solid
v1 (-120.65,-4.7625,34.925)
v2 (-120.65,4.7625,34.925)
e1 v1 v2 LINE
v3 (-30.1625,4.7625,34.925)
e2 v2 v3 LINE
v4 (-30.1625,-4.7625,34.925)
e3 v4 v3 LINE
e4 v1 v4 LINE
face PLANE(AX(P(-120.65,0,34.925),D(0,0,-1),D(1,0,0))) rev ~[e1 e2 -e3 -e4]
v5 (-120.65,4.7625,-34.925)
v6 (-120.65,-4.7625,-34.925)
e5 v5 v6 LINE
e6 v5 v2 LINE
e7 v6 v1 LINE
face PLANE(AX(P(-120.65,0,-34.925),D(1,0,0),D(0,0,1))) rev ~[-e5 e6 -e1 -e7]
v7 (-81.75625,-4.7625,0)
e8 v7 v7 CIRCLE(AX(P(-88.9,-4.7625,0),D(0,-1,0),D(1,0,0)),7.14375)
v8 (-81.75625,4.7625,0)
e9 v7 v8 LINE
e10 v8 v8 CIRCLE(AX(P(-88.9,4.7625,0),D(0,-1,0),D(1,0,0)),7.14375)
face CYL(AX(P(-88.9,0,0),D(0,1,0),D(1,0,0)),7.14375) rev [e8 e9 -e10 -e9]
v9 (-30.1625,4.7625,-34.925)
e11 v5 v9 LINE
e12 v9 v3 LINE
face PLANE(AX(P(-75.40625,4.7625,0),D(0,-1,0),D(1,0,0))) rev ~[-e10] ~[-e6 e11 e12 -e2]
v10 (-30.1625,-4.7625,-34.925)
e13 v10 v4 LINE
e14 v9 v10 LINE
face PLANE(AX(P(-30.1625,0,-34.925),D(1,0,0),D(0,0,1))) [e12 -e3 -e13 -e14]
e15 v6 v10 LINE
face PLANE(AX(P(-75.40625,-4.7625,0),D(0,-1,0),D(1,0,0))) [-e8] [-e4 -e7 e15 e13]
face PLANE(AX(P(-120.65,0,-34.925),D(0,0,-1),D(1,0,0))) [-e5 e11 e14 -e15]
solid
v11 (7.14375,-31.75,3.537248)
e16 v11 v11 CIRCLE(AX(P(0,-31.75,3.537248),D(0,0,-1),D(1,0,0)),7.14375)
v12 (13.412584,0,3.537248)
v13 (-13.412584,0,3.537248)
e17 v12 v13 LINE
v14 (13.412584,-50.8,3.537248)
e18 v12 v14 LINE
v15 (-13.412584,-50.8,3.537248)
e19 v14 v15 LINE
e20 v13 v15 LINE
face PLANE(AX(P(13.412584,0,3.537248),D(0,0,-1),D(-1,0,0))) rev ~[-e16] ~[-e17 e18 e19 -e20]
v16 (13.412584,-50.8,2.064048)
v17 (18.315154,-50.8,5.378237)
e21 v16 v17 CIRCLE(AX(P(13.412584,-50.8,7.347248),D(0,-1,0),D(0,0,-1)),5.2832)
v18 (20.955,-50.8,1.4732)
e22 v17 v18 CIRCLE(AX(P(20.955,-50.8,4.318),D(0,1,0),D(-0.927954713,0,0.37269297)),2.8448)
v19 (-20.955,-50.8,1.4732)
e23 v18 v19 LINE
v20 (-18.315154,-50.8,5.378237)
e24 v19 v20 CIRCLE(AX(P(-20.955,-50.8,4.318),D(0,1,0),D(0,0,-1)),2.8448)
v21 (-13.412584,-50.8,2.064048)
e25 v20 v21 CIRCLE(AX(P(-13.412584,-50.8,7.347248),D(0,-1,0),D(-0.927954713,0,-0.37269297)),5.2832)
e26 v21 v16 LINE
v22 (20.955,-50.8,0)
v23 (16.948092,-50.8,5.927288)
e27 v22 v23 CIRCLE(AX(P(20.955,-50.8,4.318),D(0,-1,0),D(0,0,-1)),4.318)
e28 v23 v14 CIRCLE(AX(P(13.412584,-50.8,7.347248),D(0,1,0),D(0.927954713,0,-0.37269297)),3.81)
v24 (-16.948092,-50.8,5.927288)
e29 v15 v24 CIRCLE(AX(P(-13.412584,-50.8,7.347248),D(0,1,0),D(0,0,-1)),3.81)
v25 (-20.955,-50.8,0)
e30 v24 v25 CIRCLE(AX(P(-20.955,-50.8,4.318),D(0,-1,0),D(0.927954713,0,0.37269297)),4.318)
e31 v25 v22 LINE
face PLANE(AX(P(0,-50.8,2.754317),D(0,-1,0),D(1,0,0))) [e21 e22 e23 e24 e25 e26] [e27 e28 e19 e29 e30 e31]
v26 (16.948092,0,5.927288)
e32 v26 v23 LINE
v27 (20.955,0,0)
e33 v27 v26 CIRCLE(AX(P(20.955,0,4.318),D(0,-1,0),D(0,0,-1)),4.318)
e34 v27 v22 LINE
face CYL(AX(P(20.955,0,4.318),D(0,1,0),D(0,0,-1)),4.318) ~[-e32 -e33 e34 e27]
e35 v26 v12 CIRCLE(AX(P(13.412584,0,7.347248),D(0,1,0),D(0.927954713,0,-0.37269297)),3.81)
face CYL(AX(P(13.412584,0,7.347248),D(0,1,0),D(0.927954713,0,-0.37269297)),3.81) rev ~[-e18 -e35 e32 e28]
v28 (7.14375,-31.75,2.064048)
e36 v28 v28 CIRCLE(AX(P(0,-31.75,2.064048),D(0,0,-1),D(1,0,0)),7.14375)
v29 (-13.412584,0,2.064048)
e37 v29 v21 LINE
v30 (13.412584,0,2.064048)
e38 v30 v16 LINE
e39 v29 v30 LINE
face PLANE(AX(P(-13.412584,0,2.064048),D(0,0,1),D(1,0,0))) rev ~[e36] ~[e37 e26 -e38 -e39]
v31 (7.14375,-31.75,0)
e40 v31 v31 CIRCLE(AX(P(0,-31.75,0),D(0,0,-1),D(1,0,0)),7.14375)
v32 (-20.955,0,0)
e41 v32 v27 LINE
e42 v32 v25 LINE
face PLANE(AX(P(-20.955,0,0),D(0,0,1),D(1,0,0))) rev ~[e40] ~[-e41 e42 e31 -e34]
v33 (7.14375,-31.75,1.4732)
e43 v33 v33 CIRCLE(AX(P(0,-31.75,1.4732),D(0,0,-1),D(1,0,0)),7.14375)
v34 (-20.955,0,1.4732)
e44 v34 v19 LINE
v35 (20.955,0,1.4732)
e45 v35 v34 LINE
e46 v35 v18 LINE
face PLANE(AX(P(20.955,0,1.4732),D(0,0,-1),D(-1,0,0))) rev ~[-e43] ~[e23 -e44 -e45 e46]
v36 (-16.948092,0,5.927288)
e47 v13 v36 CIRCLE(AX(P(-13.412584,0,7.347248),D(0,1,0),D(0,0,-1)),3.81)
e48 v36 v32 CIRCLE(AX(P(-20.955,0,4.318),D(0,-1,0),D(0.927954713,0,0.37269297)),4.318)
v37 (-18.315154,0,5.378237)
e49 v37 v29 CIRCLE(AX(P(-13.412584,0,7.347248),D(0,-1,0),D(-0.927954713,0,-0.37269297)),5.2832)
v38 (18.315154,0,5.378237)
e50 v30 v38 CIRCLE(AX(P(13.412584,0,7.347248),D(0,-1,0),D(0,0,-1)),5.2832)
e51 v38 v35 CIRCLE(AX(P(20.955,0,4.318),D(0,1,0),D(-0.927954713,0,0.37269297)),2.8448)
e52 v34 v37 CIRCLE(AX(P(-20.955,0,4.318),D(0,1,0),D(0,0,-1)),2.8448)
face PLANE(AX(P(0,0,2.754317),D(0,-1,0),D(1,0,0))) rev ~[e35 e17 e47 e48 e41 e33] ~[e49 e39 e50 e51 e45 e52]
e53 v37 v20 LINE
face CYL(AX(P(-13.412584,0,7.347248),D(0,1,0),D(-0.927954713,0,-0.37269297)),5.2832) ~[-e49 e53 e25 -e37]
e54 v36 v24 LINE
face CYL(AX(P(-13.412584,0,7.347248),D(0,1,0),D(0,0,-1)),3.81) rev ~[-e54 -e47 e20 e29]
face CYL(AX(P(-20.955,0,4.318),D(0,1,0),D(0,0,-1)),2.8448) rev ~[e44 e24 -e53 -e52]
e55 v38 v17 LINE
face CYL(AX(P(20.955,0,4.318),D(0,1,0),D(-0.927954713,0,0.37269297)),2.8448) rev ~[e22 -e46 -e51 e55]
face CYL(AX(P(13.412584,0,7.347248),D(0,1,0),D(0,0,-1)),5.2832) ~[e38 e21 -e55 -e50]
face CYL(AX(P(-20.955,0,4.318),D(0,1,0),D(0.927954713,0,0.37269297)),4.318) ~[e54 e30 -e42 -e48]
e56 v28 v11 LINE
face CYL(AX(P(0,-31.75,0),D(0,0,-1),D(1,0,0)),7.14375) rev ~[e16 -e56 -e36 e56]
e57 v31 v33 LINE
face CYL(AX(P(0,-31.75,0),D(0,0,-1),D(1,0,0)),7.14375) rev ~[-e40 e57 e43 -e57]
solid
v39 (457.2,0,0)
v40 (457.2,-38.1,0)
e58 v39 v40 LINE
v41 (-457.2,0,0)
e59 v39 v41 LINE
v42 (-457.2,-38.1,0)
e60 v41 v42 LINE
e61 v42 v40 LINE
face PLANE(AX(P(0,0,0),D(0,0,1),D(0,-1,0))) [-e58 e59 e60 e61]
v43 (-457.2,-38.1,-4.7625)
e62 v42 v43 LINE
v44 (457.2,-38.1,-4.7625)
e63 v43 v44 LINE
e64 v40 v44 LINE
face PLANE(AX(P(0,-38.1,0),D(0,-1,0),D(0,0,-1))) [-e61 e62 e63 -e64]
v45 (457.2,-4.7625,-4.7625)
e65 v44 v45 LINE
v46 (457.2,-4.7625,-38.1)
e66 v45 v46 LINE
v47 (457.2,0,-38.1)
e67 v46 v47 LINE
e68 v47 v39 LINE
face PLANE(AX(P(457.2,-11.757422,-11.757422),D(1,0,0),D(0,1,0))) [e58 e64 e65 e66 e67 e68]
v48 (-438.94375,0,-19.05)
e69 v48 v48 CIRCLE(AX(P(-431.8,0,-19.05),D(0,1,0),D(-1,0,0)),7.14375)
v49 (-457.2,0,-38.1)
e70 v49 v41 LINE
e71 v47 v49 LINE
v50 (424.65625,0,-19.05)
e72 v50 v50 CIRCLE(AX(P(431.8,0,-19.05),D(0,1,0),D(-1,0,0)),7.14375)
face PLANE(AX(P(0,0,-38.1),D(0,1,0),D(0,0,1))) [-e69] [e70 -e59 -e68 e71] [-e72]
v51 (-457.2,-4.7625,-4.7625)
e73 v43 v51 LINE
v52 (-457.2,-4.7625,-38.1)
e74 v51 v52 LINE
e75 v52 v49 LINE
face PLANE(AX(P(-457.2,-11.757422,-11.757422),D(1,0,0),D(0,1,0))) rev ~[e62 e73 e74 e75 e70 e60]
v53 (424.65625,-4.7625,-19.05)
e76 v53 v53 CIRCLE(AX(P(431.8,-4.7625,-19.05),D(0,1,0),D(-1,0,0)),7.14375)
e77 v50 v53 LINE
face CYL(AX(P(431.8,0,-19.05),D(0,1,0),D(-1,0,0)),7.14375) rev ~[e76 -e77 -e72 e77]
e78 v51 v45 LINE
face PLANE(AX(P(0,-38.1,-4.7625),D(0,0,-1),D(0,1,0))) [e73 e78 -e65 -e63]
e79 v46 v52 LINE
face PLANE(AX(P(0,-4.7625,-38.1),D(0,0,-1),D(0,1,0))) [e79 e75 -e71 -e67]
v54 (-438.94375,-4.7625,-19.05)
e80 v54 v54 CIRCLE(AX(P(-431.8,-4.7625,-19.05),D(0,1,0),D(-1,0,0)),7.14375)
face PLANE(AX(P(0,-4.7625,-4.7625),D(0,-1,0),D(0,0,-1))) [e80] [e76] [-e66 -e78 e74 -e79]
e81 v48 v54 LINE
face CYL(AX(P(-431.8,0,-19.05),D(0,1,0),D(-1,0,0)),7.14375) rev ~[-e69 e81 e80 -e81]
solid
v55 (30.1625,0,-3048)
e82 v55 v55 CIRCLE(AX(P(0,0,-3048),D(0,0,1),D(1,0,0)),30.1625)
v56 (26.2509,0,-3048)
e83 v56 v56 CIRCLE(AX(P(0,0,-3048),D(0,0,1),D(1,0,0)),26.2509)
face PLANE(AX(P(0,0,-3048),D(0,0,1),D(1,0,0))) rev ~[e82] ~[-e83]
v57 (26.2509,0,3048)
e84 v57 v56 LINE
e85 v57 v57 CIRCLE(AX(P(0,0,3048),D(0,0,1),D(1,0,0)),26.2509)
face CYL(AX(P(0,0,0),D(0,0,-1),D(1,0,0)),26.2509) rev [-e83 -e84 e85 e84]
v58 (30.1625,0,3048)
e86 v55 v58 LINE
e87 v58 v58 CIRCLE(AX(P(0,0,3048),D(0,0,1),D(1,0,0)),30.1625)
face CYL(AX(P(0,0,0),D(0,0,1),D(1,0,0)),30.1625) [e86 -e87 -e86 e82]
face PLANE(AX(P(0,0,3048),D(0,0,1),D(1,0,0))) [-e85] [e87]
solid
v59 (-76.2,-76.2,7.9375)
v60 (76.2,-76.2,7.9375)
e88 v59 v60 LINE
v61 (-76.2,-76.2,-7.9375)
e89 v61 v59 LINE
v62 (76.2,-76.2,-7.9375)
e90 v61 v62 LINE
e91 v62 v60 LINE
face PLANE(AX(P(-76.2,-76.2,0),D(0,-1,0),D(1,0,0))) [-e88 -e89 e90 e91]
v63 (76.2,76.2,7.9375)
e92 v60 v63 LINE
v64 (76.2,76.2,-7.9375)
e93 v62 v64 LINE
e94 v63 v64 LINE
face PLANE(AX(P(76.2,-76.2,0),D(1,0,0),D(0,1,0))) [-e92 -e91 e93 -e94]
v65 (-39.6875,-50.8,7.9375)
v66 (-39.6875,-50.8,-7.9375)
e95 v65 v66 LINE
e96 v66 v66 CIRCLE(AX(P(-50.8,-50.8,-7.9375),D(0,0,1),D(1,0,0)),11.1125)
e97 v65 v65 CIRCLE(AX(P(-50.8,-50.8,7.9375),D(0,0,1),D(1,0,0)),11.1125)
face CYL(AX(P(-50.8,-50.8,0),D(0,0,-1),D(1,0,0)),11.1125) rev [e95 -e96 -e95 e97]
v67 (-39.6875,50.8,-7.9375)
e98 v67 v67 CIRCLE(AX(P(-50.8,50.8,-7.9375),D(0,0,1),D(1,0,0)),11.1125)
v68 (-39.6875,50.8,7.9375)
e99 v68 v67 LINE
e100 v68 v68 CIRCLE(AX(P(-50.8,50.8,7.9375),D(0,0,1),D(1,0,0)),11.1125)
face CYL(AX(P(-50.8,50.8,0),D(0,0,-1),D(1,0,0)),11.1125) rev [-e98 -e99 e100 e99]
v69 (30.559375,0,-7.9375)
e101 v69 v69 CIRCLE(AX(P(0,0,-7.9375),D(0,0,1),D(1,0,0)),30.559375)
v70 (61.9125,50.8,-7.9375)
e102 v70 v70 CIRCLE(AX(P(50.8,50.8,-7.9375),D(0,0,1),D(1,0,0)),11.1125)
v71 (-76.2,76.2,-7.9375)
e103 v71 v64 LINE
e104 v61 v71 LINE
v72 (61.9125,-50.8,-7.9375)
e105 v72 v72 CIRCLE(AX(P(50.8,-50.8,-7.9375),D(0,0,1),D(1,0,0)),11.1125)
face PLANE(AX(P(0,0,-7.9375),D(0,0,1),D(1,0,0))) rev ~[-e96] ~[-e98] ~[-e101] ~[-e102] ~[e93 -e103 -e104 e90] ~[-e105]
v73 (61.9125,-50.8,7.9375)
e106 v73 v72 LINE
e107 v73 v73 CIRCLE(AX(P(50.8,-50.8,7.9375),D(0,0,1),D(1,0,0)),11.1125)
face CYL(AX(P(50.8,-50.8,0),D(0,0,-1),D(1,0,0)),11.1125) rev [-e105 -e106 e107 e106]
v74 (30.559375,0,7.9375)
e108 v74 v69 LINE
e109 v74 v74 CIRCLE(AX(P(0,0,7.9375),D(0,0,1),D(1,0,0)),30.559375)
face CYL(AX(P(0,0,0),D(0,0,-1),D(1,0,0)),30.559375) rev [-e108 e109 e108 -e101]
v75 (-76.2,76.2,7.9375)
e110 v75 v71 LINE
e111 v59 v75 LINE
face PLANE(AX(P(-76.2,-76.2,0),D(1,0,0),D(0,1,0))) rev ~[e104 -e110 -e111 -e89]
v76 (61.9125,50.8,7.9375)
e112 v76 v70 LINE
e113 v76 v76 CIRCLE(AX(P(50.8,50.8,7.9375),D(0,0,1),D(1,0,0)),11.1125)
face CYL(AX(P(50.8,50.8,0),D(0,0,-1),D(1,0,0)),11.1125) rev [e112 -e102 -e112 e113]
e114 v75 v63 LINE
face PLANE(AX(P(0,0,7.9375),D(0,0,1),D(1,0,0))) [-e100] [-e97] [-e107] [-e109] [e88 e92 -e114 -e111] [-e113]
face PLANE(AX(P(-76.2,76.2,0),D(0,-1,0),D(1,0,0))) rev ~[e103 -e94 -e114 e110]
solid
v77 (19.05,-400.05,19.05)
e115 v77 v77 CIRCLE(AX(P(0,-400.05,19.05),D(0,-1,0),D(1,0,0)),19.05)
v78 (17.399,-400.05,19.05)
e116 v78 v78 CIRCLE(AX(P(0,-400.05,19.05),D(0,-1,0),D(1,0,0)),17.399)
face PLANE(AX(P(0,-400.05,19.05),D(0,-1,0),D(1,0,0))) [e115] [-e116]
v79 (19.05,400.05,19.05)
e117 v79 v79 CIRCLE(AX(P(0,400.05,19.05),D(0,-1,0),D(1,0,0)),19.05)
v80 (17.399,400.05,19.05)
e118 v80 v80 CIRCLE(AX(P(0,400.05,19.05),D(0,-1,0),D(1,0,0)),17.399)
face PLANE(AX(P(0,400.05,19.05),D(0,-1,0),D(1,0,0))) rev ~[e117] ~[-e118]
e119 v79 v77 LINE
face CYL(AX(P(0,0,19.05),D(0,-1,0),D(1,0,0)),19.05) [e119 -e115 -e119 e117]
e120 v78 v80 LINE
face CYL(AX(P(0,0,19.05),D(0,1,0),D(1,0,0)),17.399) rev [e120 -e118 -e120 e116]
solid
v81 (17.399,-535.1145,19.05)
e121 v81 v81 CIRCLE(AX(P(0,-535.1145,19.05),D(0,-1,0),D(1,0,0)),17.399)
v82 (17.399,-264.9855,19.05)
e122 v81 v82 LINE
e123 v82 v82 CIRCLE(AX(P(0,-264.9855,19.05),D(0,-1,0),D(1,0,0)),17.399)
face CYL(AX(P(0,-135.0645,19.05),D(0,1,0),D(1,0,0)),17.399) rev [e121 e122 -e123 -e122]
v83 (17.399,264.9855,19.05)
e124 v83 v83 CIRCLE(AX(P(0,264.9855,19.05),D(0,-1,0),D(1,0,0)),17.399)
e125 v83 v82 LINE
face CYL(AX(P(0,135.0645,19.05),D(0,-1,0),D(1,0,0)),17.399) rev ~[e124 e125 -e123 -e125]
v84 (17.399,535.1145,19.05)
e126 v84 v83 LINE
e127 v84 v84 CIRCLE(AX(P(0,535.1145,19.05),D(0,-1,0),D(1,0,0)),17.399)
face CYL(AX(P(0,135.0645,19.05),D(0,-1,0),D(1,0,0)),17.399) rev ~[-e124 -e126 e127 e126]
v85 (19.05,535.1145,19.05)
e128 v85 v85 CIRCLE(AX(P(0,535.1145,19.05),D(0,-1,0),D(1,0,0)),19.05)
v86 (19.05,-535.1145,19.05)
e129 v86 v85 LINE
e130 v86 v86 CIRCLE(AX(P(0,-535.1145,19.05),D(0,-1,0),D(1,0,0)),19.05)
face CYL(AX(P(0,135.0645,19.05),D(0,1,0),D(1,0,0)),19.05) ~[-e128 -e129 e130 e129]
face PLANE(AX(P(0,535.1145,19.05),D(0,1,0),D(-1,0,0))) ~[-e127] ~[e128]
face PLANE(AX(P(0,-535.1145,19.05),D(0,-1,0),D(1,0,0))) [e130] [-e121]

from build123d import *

# Parameters (mm, degrees)
F1_W              = 152.4
F1_H              = 152.4
F1_R              = 11.1125
F1_R_2            = 30.559375
F2_DEPTH          = 7.9375
F3_W              = 90.4875
F3_H              = 69.85
F3_R              = 7.14375
F4_DEPTH          = 4.7625
F5_R              = 30.1625
F5_R_2            = 26.2509
F6_DEPTH          = 3048
F8_DEPTH          = 457.2
F9_R              = 7.14375
F10_DEPTH         = 76.201
F13_DEPTH         = 50.8
F14_R             = 7.14375
F15_DEPTH         = 3048.001
F18_R             = 19.05
F18_R_2           = 17.399
F19_DEPTH         = 400.05
F19_COPIES1_COUNT = 2
F19_COPIES1_PITCH = 135.0645


# Not quite as in the source:
# - a feature of the source that left no trace in its solid (it failed there, or was rolled back) is left out
# - a pattern or mirror of a feature is missing from the dataset's text; its kind, count and spacing are read off the source's solid


with BuildPart() as f2:
    # F1 (on Top) → F2 (new body, symmetric)
    with BuildSketch(Plane.XY):
        Rectangle(F1_W, F1_H)
        with Locations((-50.8, -50.8)):
            Circle(F1_R, mode=Mode.SUBTRACT)
        with Locations((50.8, -50.8)):
            Circle(F1_R, mode=Mode.SUBTRACT)
        with Locations((-50.8, 50.8)):
            Circle(F1_R, mode=Mode.SUBTRACT)
        Circle(F1_R_2, mode=Mode.SUBTRACT)
        with Locations((50.8, 50.8)):
            Circle(F1_R, mode=Mode.SUBTRACT)
    extrude(amount=F2_DEPTH, both=True)


with BuildPart() as f4:
    # F3 (on Front) → F4 (new body, symmetric)
    with BuildSketch(Plane.XZ):
        with Locations((-75.40625, 0)):
            Rectangle(F3_W, F3_H)
        with Locations((-88.9, 0)):
            Circle(F3_R, mode=Mode.SUBTRACT)
    extrude(amount=F4_DEPTH, both=True)


with BuildPart() as f6:
    # F5 (on Top) → F6 (new body, symmetric)
    with BuildSketch(Plane.XY):
        Circle(F5_R)
        Circle(F5_R_2, mode=Mode.SUBTRACT)
    extrude(amount=F6_DEPTH, both=True)


with BuildPart() as f8:
    # F7 (on Right) → F8 (new body, symmetric)
    with BuildSketch(Plane.YZ):
        Polygon((0, 0), (-38.1, 0), (-38.1, -4.7625), (-4.7625, -4.7625), (-4.7625, -38.1), (0, -38.1), align=None)
    extrude(amount=F8_DEPTH, both=True)

    # F9 (on face) → F10 (cut, through all)
    with BuildSketch(Plane(origin=(0, 0, 0), x_dir=(-1, 0, 0), z_dir=(0, 1, 0))):
        with Locations((-431.8, -19.05)):
            Circle(F9_R)
        with Locations((431.8, -19.05)):
            Circle(F9_R)
    extrude(amount=-F10_DEPTH, mode=Mode.SUBTRACT)


with BuildPart() as f13:
    # F12 (on Front) → F13 (new body)
    with BuildSketch(Plane.XZ):
        with BuildLine():
            ThreePointArc((-16.9480915479, 5.9272882453), (-24.5322916182, 6.7362863103), (-20.955, 0))
            Line((-20.955, 0), (20.955, 0))
            ThreePointArc((20.955, 0), (24.5322916182, 6.7362863103), (16.9480915479, 5.9272882453))
            ThreePointArc((16.9480915479, 5.9272882453), (15.5463661286, 4.1908146809), (13.4125840901, 3.5372484617))
            Line((13.4125840901, 3.5372484617), (-13.4125840901, 3.5372484617))
            ThreePointArc((-13.4125840901, 3.5372484617), (-15.5463661286, 4.1908146809), (-16.9480915479, 5.9272882453))
        make_face()
        with BuildLine():
            ThreePointArc((-18.3151544315, 5.3782369616), (-16.3714285168, 2.9703269524), (-13.4125840901, 2.0640484617))
            Line((-13.4125840901, 2.0640484617), (13.4125840901, 2.0640484617))
            ThreePointArc((13.4125840901, 2.0640484617), (16.3714285168, 2.9703269524), (18.3151544315, 5.3782369616))
            ThreePointArc((18.3151544315, 5.3782369616), (23.3118038896, 5.9112239221), (20.955, 1.4732))
            Line((20.955, 1.4732), (-20.955, 1.4732))
            ThreePointArc((-20.955, 1.4732), (-23.3118038896, 5.9112239221), (-18.3151544315, 5.3782369616))
        make_face(mode=Mode.SUBTRACT)
    extrude(amount=F13_DEPTH)

    # F14 (on face) → F15 (cut, through all)
    with BuildSketch(Plane(origin=(0, 0, 0), x_dir=(1, 0, 0), z_dir=(0, 0, -1))):
        with Locations((0, 31.75)):
            Circle(F14_R)
    extrude(amount=-F15_DEPTH, mode=Mode.SUBTRACT)


with BuildPart() as f19:
    # F18 (on Front) → F19 (new body, symmetric)
    with BuildSketch(Plane.XZ):
        with Locations((0, 19.05)):
            Circle(F18_R)
        with Locations((0, 19.05)):
            Circle(F18_R_2, mode=Mode.SUBTRACT)
    extrude(amount=F19_DEPTH, both=True)


with BuildPart() as f19_copies_1:
    # F19_copies: instance of F19
    add(f19.part.mirror(Plane.ZX.offset(67.53225)))

    # F19_copies1: F19 ×2
    with Locations(*[(0, -i * F19_COPIES1_PITCH, 0) for i in range(1, F19_COPIES1_COUNT)]):
        add(f19.part)


solid = Compound([f2.part, f4.part, f6.part, f8.part, f13.part, f19.part, f19_copies_1.part])
